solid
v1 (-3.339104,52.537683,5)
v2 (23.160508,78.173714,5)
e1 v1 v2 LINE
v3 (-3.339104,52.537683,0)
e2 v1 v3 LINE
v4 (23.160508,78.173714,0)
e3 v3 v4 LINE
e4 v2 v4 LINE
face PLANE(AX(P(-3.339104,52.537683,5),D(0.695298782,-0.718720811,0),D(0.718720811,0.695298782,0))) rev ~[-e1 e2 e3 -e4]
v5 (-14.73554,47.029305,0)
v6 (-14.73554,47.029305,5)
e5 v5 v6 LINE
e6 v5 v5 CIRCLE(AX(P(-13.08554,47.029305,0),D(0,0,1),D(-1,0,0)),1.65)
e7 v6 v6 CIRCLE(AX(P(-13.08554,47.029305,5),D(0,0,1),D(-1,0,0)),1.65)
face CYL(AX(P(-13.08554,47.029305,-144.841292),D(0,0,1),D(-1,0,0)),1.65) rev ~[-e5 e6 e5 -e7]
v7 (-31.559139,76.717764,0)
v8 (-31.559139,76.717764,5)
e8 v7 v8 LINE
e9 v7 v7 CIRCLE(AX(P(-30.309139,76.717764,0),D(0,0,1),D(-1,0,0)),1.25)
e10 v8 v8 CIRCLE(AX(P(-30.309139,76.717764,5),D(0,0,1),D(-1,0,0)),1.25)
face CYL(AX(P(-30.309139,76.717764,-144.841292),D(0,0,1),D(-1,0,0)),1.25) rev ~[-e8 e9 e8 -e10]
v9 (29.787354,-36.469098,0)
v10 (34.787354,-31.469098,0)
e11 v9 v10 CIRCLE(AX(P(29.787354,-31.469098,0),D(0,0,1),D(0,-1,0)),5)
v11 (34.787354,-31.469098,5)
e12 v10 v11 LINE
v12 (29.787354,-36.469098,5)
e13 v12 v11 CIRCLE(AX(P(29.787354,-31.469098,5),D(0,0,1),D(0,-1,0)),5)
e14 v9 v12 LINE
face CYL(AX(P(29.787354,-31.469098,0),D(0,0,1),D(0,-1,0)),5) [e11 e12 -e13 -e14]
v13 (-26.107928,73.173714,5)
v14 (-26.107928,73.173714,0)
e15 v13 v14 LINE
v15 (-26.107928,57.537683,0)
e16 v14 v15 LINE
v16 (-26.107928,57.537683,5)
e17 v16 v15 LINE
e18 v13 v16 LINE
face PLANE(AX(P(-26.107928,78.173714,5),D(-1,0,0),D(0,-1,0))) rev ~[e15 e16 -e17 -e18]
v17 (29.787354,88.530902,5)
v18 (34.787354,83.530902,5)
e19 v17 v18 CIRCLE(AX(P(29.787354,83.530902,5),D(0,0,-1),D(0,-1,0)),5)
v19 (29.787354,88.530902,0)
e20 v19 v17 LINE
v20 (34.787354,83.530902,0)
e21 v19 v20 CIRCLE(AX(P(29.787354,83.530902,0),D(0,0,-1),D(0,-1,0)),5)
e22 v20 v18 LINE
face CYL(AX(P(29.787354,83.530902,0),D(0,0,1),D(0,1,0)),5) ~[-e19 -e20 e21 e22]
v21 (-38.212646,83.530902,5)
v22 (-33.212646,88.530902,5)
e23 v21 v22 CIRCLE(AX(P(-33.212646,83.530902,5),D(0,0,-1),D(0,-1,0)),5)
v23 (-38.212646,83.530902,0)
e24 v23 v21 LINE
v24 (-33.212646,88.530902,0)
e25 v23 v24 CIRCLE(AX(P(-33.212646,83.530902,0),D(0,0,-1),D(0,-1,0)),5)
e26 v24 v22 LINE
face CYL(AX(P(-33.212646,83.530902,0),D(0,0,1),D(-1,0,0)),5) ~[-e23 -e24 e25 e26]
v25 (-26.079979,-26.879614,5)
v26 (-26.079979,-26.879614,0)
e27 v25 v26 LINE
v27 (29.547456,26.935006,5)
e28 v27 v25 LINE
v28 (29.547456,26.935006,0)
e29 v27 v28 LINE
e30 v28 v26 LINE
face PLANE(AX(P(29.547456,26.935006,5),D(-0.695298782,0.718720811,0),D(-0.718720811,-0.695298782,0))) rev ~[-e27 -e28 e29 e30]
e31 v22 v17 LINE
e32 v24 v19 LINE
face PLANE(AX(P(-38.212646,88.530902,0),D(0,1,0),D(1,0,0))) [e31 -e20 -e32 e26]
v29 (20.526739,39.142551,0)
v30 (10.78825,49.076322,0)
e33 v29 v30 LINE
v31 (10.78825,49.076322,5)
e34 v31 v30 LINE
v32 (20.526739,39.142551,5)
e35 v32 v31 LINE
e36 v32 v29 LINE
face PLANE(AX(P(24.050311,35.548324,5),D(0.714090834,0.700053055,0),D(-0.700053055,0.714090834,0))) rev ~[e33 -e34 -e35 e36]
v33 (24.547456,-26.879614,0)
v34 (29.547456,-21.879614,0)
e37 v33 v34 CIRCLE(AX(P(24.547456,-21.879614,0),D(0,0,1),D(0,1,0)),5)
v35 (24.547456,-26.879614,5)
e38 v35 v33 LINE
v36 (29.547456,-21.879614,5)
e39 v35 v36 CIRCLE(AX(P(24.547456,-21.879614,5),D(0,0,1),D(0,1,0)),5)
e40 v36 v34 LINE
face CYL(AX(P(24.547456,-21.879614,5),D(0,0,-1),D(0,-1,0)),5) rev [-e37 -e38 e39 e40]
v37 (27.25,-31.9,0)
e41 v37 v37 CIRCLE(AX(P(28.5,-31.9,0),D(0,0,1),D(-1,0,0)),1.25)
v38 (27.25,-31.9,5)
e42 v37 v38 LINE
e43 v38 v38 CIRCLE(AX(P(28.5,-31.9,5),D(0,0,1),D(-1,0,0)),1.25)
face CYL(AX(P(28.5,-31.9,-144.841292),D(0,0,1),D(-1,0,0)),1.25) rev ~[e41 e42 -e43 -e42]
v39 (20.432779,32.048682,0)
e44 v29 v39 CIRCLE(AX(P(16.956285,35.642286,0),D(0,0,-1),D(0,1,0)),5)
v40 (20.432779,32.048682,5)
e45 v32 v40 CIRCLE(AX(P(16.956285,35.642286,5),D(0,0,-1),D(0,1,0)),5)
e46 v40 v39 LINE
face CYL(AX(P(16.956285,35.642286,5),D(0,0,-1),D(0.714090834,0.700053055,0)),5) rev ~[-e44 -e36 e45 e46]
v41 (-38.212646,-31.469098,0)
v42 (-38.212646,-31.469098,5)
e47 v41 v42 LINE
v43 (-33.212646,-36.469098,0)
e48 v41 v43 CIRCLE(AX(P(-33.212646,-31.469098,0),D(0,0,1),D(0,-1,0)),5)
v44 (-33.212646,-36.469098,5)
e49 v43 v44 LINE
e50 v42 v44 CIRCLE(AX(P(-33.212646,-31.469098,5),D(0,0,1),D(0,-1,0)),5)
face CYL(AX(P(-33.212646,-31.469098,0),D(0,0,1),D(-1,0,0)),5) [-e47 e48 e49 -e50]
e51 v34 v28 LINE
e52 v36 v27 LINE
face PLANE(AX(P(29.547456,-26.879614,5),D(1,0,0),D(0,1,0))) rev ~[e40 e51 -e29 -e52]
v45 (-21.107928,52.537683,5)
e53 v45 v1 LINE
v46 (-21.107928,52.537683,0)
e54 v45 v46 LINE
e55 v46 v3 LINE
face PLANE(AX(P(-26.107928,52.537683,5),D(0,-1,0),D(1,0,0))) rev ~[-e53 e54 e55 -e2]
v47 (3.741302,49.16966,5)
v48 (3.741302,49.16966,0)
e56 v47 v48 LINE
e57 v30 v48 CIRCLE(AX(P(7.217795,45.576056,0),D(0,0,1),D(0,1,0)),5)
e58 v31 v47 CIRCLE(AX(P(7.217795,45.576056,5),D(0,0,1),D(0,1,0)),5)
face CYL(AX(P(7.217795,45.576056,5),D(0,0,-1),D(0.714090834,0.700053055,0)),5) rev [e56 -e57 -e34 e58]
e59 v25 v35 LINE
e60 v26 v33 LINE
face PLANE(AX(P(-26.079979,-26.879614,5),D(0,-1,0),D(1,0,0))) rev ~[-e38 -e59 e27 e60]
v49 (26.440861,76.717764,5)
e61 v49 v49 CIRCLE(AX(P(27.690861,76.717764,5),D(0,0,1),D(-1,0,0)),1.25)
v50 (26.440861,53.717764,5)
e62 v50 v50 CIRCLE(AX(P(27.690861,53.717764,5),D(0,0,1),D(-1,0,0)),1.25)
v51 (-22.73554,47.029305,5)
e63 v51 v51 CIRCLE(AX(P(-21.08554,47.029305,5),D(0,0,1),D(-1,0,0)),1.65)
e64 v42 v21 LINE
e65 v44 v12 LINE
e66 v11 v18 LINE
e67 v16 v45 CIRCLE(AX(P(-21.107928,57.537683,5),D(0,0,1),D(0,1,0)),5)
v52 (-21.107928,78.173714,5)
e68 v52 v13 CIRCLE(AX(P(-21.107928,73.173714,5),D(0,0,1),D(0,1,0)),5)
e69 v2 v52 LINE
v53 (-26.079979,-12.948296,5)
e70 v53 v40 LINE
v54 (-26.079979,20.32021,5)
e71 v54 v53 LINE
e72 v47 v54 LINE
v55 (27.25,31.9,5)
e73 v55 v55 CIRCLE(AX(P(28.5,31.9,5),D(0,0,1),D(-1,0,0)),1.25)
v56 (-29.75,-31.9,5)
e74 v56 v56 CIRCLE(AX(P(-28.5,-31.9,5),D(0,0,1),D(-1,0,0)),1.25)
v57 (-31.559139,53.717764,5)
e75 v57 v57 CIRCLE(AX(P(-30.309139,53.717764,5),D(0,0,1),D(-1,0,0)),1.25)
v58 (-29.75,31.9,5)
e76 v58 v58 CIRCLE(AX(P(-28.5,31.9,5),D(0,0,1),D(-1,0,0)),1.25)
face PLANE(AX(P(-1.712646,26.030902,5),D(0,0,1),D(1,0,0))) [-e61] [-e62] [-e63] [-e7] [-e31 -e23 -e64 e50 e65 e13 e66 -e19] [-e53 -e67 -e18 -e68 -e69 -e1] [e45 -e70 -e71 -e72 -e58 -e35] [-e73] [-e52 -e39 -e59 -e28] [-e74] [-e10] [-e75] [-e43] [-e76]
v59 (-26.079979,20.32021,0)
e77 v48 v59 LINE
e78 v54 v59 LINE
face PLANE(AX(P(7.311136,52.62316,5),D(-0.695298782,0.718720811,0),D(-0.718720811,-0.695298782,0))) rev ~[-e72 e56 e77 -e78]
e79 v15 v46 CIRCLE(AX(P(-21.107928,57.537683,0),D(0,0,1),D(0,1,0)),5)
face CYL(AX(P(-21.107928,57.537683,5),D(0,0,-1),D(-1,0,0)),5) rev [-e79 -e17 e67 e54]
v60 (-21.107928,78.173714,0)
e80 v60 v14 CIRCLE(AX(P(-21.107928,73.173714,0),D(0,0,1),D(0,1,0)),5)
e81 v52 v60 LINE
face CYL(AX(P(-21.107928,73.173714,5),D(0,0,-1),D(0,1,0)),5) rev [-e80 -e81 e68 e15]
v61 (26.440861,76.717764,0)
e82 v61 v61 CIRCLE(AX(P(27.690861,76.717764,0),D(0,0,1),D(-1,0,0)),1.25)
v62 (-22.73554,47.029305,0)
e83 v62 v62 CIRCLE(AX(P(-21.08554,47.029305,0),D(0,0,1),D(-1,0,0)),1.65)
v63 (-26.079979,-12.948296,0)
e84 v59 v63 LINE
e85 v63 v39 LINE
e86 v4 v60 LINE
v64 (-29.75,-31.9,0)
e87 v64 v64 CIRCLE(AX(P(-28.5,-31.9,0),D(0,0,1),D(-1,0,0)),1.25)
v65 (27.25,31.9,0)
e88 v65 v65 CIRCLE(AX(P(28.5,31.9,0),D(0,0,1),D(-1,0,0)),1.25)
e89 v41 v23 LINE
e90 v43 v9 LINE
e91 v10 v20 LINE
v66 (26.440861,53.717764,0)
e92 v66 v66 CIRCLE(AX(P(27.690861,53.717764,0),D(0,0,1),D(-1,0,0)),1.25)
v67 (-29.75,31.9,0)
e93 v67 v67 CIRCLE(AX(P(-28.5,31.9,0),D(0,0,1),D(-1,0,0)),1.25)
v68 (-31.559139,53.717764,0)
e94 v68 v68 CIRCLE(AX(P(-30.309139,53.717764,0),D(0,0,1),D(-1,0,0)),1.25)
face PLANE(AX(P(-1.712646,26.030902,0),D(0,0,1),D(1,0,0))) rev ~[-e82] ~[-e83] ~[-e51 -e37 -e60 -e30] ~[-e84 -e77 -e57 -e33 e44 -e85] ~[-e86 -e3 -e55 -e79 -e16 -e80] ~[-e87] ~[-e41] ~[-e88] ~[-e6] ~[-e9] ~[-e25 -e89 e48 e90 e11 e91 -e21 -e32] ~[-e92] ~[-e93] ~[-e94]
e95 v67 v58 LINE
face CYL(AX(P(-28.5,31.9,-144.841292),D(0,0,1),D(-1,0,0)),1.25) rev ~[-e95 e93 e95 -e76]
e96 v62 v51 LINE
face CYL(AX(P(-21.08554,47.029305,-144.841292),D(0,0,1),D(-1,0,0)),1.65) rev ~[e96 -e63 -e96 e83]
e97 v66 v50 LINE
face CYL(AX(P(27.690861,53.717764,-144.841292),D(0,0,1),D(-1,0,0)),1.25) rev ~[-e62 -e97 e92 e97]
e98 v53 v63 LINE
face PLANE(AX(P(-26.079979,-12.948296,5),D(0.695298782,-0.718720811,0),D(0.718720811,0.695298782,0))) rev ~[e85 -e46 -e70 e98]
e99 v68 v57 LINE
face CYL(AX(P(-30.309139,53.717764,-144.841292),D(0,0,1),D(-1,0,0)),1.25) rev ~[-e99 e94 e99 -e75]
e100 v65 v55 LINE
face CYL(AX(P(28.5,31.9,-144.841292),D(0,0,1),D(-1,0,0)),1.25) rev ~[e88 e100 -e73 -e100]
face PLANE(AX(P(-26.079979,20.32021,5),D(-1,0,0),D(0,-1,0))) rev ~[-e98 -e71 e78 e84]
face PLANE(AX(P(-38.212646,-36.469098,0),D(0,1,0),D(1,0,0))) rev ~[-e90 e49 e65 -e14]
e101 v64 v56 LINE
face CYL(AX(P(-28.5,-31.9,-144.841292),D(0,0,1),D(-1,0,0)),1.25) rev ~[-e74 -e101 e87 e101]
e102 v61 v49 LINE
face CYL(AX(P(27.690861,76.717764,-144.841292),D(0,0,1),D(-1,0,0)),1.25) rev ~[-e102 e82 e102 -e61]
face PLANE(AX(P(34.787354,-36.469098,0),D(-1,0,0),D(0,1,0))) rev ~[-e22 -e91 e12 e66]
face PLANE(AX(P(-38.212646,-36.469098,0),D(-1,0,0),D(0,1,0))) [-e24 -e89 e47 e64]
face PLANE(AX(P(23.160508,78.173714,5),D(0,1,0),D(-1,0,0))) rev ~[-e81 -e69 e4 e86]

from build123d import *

# Parameters (mm, degrees)
F0_W     = 73
F0_H     = 125
F1_DEPTH = 5
F2_D     = 2.5
F3_D     = 3.3
F4_D     = 2.5
F6_DEPTH = 25
F7_R     = 5


# Not quite as in the source:
# - a feature names something its author has since deleted; it is built from what else it names


with BuildPart() as f1:
    # F0 (on Top) → F1 (new body)
    with BuildSketch(Plane.XY):
        with Locations((-1.7126457989, 26.0309018195)):
            Rectangle(F0_W, F0_H)
    extrude(amount=F1_DEPTH)

    # F2 (through all)
    with Locations(Plane(origin=(0, 0, 0), x_dir=(1, 0, 0), z_dir=(0, 0, -1))):
        with Locations((-30.3091388196, -76.7177641392), (27.6908611804, -76.7177641392), (27.6908611804, -53.7177641392), (-30.3091388196, -53.7177641392)):
            Hole(F2_D / 2)

    # F3 (through all)
    with Locations(Plane(origin=(0, 0, 0), x_dir=(1, 0, 0), z_dir=(0, 0, -1))):
        with Locations((-21.0855398327, -47.0293052495), (-13.0855398327, -47.0293052495)):
            Hole(F3_D / 2)

    # F4 (through all)
    with Locations(Plane(origin=(0, 0, 0), x_dir=(1, 0, 0), z_dir=(0, 0, -1))):
        with Locations((-28.5, -31.9), (28.5, -31.9), (28.5, 31.9), (-28.5, 31.9)):
            Hole(F4_D / 2)

    # F5 (on face) → F6 (cut)
    with BuildSketch(Plane.XY.offset(5)):
        Polygon((24.0503107939, 35.5483236554), (7.3111363315, 52.6231595762), (-26.0799791984, 20.3202102417), (-26.0799791984, -12.9482956412), align=None)
        Polygon((29.5474557331, 26.9350063375), (-26.0799791984, -26.8796142191), (29.5474557331, -26.8796142191), align=None)
        Polygon((-3.3391041424, 52.5376833975), (23.1605084746, 78.173713526), (-26.1079283048, 78.173713526), (-26.1079283048, 52.5376833975), align=None)
    extrude(amount=-F6_DEPTH, mode=Mode.SUBTRACT)

    # F7
    f7_edges = [f1.edges().sort_by_distance(p)[0] for p in [
        (-38.212646, 88.530902, 2.5),
        (34.787354, 88.530902, 2.5),
        (34.787354, -36.469098, 2.5),
        (-38.212646, -36.469098, 2.5),
        (-26.107928, 52.537683, 2.5),
        (-26.107928, 78.173714, 2.5),
        (24.050311, 35.548324, 2.5),
        (7.311136, 52.62316, 2.5),
        (29.547456, -26.879614, 2.5),
    ]]
    fillet(f7_edges, radius=F7_R)


solid = f1.part
